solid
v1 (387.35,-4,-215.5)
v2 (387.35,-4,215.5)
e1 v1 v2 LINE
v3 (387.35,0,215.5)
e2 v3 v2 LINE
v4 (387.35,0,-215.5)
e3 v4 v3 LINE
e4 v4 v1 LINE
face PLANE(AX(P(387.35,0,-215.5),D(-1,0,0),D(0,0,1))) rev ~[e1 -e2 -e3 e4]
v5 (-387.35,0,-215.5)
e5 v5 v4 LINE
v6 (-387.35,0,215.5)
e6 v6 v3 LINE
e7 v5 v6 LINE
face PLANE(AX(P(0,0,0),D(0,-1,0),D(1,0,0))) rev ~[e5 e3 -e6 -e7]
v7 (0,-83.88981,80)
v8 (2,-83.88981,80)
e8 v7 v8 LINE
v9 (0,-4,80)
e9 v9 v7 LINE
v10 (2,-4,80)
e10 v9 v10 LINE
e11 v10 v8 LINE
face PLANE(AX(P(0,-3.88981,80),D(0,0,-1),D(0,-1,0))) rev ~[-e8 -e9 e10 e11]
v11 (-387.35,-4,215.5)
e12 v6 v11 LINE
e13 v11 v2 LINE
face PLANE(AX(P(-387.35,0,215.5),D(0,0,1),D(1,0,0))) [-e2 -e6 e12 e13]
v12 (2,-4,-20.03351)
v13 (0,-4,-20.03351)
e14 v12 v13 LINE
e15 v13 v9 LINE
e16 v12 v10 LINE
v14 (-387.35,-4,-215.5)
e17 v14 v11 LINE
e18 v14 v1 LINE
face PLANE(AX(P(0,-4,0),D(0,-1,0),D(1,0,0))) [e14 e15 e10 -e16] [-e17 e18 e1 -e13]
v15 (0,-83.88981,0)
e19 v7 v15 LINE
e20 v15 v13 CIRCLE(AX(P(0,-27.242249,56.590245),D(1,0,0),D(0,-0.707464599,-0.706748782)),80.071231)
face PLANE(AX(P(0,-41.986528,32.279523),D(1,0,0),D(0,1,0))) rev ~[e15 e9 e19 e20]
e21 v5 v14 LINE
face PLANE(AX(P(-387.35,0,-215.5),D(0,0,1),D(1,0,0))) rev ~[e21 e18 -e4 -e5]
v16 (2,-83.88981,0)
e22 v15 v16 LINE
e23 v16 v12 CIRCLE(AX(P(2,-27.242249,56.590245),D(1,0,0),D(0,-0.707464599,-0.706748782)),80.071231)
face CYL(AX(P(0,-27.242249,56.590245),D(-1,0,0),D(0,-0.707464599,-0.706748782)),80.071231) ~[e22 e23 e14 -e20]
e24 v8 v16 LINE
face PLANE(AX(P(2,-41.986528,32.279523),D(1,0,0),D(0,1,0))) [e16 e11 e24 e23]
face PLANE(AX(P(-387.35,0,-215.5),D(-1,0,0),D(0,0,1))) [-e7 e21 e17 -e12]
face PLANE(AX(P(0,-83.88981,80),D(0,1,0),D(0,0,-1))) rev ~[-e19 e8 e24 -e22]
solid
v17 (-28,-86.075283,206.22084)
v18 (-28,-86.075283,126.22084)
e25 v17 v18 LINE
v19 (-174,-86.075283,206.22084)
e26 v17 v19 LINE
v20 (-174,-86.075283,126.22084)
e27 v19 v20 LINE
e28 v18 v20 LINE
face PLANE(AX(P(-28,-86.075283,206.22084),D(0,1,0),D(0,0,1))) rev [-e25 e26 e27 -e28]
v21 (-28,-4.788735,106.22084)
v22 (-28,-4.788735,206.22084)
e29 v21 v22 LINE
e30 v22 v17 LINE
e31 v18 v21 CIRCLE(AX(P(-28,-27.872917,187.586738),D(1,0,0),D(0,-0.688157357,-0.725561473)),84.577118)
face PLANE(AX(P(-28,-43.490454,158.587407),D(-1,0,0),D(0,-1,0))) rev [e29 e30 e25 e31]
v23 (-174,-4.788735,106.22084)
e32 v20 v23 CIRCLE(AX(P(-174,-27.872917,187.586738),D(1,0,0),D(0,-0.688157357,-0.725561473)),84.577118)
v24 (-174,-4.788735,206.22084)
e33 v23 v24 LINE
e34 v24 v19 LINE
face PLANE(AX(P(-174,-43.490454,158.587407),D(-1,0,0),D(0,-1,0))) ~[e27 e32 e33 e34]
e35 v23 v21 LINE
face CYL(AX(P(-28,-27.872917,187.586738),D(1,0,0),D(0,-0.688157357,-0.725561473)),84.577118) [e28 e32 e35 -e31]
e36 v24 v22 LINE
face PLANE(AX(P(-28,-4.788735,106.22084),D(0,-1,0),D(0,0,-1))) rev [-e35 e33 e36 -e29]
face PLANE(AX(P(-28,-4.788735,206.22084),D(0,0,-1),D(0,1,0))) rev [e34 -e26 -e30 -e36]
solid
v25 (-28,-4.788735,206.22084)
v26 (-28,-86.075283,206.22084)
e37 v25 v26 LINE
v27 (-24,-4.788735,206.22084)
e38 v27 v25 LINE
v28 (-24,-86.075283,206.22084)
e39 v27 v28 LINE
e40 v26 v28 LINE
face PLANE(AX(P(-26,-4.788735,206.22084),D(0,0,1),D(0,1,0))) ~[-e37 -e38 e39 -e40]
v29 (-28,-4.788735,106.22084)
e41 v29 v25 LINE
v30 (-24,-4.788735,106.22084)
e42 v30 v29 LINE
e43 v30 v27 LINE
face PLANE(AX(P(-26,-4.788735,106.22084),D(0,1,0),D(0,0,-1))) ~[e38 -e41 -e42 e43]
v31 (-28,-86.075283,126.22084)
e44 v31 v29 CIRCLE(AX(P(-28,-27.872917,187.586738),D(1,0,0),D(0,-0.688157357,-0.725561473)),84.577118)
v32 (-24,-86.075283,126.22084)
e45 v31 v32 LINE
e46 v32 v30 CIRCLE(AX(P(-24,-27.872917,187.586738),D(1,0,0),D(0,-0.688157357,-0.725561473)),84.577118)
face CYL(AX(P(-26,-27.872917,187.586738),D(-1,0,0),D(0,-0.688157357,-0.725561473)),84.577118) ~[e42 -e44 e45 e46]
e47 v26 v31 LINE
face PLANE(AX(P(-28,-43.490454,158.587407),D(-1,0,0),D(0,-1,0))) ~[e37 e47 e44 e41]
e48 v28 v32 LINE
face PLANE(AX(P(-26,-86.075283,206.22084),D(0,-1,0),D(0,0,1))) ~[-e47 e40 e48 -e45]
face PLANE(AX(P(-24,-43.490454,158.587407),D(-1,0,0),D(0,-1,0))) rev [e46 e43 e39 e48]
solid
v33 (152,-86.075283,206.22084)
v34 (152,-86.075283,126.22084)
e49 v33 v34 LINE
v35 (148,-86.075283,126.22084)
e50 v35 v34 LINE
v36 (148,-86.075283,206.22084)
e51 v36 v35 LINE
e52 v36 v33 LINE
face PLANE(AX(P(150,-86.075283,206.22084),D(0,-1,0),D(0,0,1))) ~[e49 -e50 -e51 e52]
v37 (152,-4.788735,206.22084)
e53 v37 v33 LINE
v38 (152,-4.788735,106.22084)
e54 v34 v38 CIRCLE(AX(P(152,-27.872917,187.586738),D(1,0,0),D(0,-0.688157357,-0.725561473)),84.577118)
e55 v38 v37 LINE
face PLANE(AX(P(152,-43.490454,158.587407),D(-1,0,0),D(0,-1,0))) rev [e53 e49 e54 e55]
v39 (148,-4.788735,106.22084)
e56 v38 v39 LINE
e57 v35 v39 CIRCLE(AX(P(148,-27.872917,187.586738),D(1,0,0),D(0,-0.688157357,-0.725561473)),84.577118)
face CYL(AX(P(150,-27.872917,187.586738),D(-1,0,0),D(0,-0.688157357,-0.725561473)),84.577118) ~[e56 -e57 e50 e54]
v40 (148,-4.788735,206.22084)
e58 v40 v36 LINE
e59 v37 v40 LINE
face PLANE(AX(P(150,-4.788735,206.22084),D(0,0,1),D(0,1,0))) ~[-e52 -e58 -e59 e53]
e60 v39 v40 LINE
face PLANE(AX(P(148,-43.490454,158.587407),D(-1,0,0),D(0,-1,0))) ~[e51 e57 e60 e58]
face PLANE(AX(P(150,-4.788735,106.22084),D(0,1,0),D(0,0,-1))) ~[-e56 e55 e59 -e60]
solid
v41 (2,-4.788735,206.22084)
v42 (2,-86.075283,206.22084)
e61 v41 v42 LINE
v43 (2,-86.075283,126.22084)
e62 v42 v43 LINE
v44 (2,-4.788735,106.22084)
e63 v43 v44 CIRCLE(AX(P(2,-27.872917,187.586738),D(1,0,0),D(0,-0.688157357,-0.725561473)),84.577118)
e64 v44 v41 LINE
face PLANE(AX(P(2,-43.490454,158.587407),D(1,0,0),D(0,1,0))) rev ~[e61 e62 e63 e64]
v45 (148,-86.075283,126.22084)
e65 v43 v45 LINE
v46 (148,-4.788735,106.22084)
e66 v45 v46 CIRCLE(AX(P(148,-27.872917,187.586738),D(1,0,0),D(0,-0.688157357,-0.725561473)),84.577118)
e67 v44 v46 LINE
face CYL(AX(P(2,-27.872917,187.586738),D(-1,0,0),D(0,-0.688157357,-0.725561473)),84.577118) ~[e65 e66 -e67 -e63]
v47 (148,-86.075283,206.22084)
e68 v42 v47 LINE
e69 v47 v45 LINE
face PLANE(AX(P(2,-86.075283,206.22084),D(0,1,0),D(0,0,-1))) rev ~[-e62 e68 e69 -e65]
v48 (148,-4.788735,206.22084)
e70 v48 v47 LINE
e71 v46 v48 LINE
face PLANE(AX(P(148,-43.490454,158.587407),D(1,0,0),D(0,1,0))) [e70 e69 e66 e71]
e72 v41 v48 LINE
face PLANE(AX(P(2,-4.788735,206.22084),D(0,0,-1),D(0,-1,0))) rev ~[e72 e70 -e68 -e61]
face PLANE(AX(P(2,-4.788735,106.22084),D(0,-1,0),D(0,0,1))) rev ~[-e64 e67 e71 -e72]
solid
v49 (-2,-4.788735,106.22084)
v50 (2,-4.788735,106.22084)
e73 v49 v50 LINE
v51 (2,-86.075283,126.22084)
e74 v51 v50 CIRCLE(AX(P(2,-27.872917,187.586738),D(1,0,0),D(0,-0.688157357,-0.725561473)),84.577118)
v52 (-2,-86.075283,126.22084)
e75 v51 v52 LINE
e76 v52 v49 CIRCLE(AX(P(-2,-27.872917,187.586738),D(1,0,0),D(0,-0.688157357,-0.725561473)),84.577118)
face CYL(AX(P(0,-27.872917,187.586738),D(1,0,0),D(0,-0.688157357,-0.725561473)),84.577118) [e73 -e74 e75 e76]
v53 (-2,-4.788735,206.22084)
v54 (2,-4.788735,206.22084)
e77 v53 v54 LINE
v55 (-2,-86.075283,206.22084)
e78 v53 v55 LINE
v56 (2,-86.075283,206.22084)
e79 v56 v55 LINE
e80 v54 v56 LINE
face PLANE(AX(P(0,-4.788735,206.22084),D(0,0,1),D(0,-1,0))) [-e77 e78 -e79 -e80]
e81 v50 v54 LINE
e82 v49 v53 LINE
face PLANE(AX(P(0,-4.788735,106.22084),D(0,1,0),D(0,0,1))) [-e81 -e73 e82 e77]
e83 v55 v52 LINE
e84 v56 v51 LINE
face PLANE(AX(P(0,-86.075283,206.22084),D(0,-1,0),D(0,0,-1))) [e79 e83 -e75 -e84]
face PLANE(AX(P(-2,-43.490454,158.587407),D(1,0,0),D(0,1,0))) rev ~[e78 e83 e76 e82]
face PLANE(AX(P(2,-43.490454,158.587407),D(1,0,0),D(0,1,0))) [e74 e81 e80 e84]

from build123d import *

# Parameters (mm, degrees)
F0_W          = 774.7
F0_H          = 431
F1_DEPTH      = 4
F3_DEPTH      = 2
F3_DEPTH_BACK = 2
F7_DEPTH      = 146
F9_DEPTH      = 2


# Not quite as in the source:
# - a pattern or mirror of a feature is missing from the dataset's text; its kind, count and spacing are read off the source's solid


with BuildPart() as f1:
    # F0 (on Front) → F1 (new body)
    with BuildSketch(Plane.XZ):
        Rectangle(F0_W, F0_H)
    extrude(amount=F1_DEPTH)

    # F8 (on Right) → F9 (join)
    with BuildSketch(Plane.YZ):
        with BuildLine():
            ThreePointArc((-83.8898100026, 0), (-46.6623748041, -21.0902592062), (-3.8898100026, -20))
            Line((-3.8898100026, -20), (-3.8898100026, 80))
            Line((-3.8898100026, 80), (-83.8898100026, 80))
            Line((-83.8898100026, 80), (-83.8898100026, 0))
        make_face()
    extrude(amount=F9_DEPTH)


with BuildPart() as f3:
    # F2 (on Right) → F3 (new body, two sides)
    with BuildSketch(Plane.YZ) as f3_sk:
        with BuildLine():
            ThreePointArc((-86.0752825102, 126.2208398572), (-48.079888449, 105.4589891292), (-4.7887346299, 106.2208398572))
            Line((-4.7887346299, 106.2208398572), (-4.7887346299, 206.2208398572))
            Line((-4.7887346299, 206.2208398572), (-86.0752825102, 206.2208398572))
            Line((-86.0752825102, 206.2208398572), (-86.0752825102, 126.2208398572))
        make_face()
    extrude(amount=F3_DEPTH)
    extrude(f3_sk.sketch, amount=-F3_DEPTH_BACK)


with BuildPart() as f3_copies_1:
    # F3_copies: instance of F3
    add(f3.part.mirror(Plane(origin=(-15, 0, 0), x_dir=(0, 0, -1), z_dir=(-1, 0, 0))))



with BuildPart() as f3_copies1_1:
    # F3_copies1: instance of F3
    add(f3.part.mirror(Plane(origin=(-13, 0, 0), x_dir=(0, 0, -1), z_dir=(-1, 0, 0))))


with BuildPart() as f3_copies2_1:
    # F3_copies2: instance of F3
    add(f3.part.mirror(Plane(origin=(-86, 0, 0), x_dir=(0, 0, -1), z_dir=(-1, 0, 0))))


with BuildPart() as f5_1:
    # F5: instance of F3
    add(f3.part.mirror(Plane.YZ.offset(75)))


with BuildPart() as f7:
    # F7 (new): a face of the model
    f7_faces = [f3.part.faces().sort_by_distance(p)[0] for p in [
        (2, -44.1296538263, 157.155690045),
    ]]
    extrude(f7_faces, amount=F7_DEPTH)


with BuildPart() as f3_copies_1_1:
    add(f3_copies_1.part)

    add(f3_copies2_1.part)  # F7_copies merges F3_copies2_1
    # F7_copies: F7 across plane
    add(f7.part.mirror(Plane(origin=(-13, 0, 0), x_dir=(0, 0, -1), z_dir=(-1, 0, 0))))


solid = Compound([f1.part, f3.part, f3_copies1_1.part, f5_1.part, f7.part, f3_copies_1_1.part])
